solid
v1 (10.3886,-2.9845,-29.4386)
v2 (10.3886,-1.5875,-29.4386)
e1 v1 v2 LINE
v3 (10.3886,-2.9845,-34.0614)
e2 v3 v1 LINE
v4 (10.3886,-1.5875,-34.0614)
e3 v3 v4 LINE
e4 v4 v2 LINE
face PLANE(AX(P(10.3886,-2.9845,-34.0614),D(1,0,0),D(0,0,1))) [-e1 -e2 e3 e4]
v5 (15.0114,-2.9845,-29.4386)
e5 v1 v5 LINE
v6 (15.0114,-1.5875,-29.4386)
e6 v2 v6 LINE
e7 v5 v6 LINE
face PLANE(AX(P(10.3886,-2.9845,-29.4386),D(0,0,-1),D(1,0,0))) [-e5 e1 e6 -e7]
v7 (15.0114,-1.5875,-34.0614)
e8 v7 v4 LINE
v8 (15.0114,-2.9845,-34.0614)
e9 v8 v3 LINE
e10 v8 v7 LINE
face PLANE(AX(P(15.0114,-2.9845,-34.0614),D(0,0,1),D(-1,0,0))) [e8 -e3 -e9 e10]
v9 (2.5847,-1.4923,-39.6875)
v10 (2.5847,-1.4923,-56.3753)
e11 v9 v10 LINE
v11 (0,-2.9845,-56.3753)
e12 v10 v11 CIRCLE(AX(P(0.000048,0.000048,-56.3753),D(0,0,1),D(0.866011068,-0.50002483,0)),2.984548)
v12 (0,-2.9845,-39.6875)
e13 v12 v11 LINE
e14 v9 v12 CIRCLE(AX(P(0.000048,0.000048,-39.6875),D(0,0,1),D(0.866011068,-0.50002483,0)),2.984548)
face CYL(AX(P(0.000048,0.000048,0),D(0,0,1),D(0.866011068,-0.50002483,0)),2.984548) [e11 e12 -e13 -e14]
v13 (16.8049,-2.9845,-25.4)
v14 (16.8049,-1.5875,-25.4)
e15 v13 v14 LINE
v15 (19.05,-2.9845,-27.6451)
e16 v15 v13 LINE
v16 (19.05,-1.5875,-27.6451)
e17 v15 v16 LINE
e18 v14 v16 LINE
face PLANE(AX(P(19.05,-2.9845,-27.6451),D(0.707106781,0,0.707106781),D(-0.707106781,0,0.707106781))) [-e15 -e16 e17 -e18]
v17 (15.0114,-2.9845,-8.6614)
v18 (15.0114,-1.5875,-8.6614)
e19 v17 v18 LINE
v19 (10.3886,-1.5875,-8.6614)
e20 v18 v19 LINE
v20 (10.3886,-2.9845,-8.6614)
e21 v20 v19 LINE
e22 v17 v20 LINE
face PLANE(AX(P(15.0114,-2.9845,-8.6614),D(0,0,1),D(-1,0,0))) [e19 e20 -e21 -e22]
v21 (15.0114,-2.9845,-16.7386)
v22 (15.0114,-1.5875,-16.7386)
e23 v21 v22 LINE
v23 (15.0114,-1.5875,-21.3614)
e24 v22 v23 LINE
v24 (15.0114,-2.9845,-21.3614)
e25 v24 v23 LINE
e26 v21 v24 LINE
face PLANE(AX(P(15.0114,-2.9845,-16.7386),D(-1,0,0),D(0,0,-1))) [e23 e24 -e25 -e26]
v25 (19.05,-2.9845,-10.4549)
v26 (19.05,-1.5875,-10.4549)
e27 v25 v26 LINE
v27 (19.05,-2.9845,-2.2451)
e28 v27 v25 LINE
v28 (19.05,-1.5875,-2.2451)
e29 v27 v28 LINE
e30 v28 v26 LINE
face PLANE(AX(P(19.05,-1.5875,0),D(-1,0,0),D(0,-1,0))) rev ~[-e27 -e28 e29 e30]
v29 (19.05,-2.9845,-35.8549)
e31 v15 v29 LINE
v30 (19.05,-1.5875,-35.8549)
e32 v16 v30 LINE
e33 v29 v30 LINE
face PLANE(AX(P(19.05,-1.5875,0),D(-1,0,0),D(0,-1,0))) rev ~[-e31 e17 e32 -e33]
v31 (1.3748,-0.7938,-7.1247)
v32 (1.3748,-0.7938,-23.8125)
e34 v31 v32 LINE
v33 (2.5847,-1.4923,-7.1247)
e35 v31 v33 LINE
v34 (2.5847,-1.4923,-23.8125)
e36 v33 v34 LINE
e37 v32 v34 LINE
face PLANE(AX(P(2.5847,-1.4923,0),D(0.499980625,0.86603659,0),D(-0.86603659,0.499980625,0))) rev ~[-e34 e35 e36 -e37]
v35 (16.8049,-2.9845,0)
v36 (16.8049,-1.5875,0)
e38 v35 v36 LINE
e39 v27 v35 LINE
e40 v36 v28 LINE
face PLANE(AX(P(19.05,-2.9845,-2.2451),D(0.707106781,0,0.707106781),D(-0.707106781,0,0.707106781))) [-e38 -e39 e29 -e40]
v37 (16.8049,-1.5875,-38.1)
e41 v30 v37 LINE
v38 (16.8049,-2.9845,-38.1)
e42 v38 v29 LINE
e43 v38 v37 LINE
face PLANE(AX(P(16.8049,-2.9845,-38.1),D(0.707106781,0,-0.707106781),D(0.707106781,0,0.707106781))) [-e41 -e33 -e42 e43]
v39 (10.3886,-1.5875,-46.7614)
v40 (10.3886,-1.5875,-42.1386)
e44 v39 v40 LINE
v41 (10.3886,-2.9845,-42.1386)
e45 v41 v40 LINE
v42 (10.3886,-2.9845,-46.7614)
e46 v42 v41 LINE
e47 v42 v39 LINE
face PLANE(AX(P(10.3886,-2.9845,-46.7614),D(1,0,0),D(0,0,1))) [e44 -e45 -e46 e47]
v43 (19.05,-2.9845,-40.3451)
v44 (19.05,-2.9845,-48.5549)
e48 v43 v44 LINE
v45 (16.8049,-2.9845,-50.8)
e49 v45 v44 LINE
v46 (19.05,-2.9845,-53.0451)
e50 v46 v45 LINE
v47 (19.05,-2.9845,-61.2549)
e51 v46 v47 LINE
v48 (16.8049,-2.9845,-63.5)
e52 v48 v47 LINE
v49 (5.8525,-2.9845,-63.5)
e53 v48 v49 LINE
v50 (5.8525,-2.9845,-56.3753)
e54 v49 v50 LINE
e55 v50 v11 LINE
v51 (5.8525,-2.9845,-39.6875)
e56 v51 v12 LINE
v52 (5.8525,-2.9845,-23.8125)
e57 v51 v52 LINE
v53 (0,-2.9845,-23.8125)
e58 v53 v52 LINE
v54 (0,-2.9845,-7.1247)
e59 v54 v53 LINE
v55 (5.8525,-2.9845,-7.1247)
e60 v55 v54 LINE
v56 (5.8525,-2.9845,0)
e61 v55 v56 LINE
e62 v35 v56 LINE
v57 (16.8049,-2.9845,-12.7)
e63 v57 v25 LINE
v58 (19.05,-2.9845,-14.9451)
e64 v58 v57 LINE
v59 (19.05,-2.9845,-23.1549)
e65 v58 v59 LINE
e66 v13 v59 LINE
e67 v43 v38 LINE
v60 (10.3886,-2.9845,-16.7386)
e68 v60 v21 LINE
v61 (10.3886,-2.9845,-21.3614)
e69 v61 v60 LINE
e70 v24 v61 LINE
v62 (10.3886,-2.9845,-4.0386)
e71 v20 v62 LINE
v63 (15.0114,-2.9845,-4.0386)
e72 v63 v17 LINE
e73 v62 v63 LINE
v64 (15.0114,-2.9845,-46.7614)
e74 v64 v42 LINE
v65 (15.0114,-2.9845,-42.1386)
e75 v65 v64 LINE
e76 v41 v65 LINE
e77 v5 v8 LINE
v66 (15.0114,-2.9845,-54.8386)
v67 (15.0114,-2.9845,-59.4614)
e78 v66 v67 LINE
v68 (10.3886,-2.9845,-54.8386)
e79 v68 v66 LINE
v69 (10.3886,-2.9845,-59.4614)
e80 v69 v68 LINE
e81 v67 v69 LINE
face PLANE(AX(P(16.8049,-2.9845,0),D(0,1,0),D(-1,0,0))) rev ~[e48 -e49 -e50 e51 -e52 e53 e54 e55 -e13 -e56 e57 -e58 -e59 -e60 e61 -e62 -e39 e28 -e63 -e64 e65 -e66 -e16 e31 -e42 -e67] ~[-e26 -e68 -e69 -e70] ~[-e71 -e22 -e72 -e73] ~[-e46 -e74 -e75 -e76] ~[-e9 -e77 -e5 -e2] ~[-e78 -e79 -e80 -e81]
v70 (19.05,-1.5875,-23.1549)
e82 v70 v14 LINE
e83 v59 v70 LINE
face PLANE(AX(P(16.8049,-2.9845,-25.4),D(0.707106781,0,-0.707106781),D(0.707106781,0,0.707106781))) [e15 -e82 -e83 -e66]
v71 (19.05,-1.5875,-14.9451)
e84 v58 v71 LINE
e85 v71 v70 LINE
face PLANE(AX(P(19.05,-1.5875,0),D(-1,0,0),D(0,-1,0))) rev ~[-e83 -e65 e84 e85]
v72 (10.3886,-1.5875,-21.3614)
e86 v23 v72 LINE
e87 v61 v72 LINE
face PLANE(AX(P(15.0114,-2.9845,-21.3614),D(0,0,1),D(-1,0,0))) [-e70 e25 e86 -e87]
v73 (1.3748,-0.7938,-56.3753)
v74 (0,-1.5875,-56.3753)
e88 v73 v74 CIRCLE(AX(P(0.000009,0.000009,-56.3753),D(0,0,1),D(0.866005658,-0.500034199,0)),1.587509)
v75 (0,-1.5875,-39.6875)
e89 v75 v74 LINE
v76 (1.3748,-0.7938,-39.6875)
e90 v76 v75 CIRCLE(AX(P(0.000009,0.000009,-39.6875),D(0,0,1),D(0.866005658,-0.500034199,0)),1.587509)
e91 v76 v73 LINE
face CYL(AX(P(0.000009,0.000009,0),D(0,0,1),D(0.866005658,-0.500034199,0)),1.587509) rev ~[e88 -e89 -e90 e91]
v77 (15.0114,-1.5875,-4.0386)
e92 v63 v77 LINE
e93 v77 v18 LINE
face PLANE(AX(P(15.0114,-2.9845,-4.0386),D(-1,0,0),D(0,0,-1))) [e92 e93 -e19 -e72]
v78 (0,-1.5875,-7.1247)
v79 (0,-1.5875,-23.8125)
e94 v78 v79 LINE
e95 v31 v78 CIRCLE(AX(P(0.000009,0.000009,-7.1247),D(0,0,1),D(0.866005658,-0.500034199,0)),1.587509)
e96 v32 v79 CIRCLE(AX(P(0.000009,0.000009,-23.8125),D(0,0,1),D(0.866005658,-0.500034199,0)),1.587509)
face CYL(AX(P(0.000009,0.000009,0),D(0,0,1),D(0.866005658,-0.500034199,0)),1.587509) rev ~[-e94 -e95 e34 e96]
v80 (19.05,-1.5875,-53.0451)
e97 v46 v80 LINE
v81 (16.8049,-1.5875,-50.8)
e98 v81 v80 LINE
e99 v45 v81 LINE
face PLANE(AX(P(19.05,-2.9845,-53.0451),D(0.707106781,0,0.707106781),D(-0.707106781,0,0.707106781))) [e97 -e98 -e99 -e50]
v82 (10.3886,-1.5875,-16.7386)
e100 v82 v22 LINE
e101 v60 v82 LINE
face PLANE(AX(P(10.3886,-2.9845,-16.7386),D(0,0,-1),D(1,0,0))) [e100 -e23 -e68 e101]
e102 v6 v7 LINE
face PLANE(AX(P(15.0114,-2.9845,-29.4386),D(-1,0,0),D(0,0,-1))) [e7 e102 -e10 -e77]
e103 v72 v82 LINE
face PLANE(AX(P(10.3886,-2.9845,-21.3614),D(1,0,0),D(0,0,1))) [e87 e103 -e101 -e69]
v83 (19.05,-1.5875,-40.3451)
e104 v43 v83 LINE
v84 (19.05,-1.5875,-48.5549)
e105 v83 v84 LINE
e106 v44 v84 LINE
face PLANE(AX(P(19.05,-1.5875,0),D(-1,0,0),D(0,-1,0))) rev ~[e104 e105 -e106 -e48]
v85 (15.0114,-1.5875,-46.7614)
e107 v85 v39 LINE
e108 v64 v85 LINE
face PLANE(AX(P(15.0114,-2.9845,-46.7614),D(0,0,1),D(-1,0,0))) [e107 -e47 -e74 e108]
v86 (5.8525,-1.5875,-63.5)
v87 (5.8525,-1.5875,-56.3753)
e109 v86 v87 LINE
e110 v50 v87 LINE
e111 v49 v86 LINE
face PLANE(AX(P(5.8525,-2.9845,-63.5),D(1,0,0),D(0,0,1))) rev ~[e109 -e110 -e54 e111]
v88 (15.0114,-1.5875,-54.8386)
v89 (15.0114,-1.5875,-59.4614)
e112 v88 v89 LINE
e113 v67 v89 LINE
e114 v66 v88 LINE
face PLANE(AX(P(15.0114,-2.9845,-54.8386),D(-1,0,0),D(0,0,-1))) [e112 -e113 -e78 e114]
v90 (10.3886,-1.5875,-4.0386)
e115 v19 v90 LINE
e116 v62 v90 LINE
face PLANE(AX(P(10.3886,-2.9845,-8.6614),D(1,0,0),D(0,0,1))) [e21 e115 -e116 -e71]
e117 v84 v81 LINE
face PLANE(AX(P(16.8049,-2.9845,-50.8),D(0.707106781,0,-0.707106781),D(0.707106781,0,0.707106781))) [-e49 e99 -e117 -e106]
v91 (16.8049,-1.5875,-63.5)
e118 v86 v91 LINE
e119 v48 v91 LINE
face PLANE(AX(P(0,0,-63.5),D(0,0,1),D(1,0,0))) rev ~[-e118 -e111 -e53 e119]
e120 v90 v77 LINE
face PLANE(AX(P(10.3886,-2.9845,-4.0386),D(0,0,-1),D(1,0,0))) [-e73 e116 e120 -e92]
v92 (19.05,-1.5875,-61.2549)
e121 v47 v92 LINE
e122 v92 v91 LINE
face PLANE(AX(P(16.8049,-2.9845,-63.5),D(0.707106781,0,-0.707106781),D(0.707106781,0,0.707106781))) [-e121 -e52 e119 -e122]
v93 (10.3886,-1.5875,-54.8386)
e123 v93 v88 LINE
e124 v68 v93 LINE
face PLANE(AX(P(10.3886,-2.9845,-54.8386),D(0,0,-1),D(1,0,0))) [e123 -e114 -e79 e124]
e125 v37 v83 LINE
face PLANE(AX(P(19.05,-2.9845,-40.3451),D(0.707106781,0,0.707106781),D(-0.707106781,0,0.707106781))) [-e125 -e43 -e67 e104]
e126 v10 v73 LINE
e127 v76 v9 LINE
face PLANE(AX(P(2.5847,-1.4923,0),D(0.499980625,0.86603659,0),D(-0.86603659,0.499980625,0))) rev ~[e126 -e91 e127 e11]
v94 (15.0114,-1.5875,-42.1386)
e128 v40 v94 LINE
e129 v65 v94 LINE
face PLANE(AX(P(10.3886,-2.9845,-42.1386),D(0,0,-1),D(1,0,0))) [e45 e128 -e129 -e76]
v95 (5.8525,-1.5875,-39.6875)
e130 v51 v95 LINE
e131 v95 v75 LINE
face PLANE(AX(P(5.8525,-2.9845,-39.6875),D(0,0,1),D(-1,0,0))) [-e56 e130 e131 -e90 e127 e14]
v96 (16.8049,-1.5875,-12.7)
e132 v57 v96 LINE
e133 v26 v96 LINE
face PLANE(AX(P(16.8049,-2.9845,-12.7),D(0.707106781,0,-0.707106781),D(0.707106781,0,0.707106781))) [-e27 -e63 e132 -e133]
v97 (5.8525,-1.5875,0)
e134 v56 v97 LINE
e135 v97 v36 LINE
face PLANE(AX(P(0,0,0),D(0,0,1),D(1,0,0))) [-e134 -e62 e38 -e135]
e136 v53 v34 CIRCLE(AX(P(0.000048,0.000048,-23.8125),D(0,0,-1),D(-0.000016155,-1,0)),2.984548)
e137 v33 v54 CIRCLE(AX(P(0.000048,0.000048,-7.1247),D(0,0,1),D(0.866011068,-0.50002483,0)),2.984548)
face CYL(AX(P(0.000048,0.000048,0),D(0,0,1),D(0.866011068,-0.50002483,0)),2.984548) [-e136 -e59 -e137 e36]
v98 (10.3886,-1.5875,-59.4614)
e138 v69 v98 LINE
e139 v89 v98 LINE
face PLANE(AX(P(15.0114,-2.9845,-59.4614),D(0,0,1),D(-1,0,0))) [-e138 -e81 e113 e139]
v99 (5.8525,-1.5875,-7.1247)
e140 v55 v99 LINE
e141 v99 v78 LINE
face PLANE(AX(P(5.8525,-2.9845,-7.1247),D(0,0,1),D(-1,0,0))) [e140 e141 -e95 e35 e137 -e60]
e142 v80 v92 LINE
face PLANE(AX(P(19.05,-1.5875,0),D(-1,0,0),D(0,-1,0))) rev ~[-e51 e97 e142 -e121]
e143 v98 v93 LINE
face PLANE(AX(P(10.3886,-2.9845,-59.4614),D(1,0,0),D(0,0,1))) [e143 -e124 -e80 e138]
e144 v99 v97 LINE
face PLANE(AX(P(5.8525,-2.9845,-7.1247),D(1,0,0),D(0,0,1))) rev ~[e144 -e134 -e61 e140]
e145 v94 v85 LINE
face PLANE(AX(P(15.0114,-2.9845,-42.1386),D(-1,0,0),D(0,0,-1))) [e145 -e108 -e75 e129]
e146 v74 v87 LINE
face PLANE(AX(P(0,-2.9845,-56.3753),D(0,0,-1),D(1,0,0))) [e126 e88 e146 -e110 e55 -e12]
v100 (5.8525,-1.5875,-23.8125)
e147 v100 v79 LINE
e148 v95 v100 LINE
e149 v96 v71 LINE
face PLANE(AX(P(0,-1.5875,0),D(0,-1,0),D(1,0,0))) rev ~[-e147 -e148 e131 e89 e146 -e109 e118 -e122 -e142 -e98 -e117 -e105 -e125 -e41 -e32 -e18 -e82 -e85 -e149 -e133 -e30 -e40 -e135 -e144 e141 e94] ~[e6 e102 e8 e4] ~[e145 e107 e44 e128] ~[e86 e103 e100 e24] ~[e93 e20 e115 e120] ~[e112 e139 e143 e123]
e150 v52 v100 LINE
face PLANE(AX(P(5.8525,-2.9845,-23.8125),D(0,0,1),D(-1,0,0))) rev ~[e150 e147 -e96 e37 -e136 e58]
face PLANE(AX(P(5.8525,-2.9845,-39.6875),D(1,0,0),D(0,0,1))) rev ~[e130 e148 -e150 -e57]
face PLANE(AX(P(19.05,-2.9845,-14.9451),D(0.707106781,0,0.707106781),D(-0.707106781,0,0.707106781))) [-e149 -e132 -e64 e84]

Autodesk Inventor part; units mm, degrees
ref_plane "YZ Plane" through (0, 0, 0) normal (1, 0, 0) x (0, 1, 0)
ref_plane "XZ Plane" through (0, 0, 0) normal (0, 1, 0) x (-1, 0, 0)
ref_plane "XY Plane" through (0, 0, 0) normal (0, 0, 1) x (1, 0, 0)
sketch "Sketch1" plane through (0, 0, 0) normal (0, 0, 1) x (1, 0, 0)
  line L0 (2.5847, -1.4923) -> (1.3748, -0.7938)
  arc A0 (2.5847, -1.4923) -> (0, -2.9845) centre (0, 0) ccw
  arc A1 (1.3748, -0.7938) -> (0, -1.5875) centre (0, 0) ccw
  arc A2 (1.3748, -0.7938) -> (0, -1.5875) centre (0, 0) ccw
  line L1 (0, -1.5875) -> (16.8049, -1.5875)
  line L2 (16.8049, -2.9845) -> (0, -2.9845)
  arc A3 (2.5847, -1.4923) -> (0, -2.9845) centre (0, 0) ccw
  line L3 (2.5847, -1.4923) -> (1.3748, -0.7938)
  line L4 (19.05, -1.5875) -> (16.8049, -1.5875)
  line L5 (19.05, -2.9845) -> (16.8049, -2.9845)
  line L6 (19.05, -1.5875) -> (19.05, -2.9845)
  point P0 (0, 0)
  point P1 (15.875, -2.9845)
extrude "Extrusion1" add sketch "Sketch1" against normal blind 63.5
sketch "Sketch2" plane through (0, -2.9845, 0) normal (0, -1, 0) x (1, 0, 0)
  line L0 (19.05, -23.1549) -> (19.05, -14.9451)
  line L1 (19.05, -14.9451) -> (16.8049, -12.7)
  line L2 (16.8049, -12.7) -> (19.05, -10.4549)
  line L3 (19.05, -10.4549) -> (19.05, -2.2451)
  line L4 (19.05, -2.2451) -> (16.8049, 0)
  line L5 (-2.9845, 0) -> (16.8049, 0)
  line L6 (0, -7.1247) -> (0, 0)
  line L7 (5.8525, -7.1247) -> (-2.9845, -7.1247)
  line L8 (5.8525, -39.6875) -> (5.8525, 0)
  line L9 (5.8525, -23.8125) -> (-2.9845, -23.8125)
  line L10 (0, -39.6875) -> (0, -23.8125)
  line L11 (5.8525, -39.6875) -> (-2.9845, -39.6875)
  line L12 (5.8525, -63.5) -> (5.8525, -39.6875)
  line L13 (-2.9845, -56.3753) -> (5.8525, -56.3753)
  line L14 (0, -63.5) -> (0, -56.3753)
  line L15 (16.8049, -63.5) -> (-2.9845, -63.5)
  line L16 (16.8049, -63.5) -> (19.05, -61.2549)
  line L17 (19.05, -61.2549) -> (19.05, -53.0451)
  line L18 (19.05, -53.0451) -> (16.8049, -50.8)
  line L19 (16.8049, -50.8) -> (19.05, -48.5549)
  line L20 (19.05, -48.5549) -> (19.05, -40.3451)
  line L21 (19.05, -40.3451) -> (16.8049, -38.1)
  line L22 (16.8049, -38.1) -> (19.05, -35.8549)
  line L23 (19.05, -35.8549) -> (19.05, -27.6451)
  line L24 (19.05, -27.6451) -> (16.8049, -25.4)
  line L25 (16.8049, -25.4) -> (19.05, -23.1549)
  line L26 (15.0114, -42.1386) -> (15.0114, -46.7614)
  line L27 (15.0114, -46.7614) -> (10.3886, -46.7614)
  line L28 (10.3886, -46.7614) -> (10.3886, -42.1386)
  line L29 (10.3886, -42.1386) -> (15.0114, -42.1386)
  line L30 (15.0114, -29.4386) -> (15.0114, -34.0614)
  line L31 (15.0114, -34.0614) -> (10.3886, -34.0614)
  line L32 (10.3886, -34.0614) -> (10.3886, -29.4386)
  line L33 (10.3886, -29.4386) -> (15.0114, -29.4386)
  line L34 (15.0114, -16.7386) -> (15.0114, -21.3614)
  line L35 (15.0114, -21.3614) -> (10.3886, -21.3614)
  line L36 (10.3886, -21.3614) -> (10.3886, -16.7386)
  line L37 (10.3886, -16.7386) -> (15.0114, -16.7386)
  line L38 (15.0114, -4.0386) -> (15.0114, -8.6614)
  line L39 (15.0114, -8.6614) -> (10.3886, -8.6614)
  line L40 (10.3886, -8.6614) -> (10.3886, -4.0386)
  line L41 (10.3886, -4.0386) -> (15.0114, -4.0386)
  line L42 (15.0114, -54.8386) -> (15.0114, -59.4614)
  line L43 (15.0114, -59.4614) -> (10.3886, -59.4614)
  line L44 (10.3886, -59.4614) -> (10.3886, -54.8386)
  line L45 (10.3886, -54.8386) -> (15.0114, -54.8386)
  line L46 (-2.9845, 0) -> (-2.9845, -63.5) projected
  line L47 (19.05, -53.0451) -> (19.05, -48.5549)
  line L48 (19.05, -40.3451) -> (19.05, -35.8549)
  line L49 (19.05, -27.6451) -> (19.05, -23.1549)
  line L50 (19.05, -14.9451) -> (19.05, -10.4549)
  line L51 (0, 0) -> (16.8049, 0) projected
  line L52 (16.8049, -63.5) -> (19.05, -63.5)
  line L53 (19.05, -63.5) -> (19.05, -61.2549)
  line L54 (19.05, -2.2451) -> (19.05, 0)
  line L55 (19.05, 0) -> (16.8049, 0)
  line L56 (16.8049, -63.5) -> (19.05, -61.2549)
  line L57 (19.05, -2.2451) -> (16.8049, 0)
  line L58 (0, -63.5) -> (16.8049, -63.5) projected
  line L59 (5.8525, -7.1247) -> (-2.9845, -7.1247)
  line L60 (-2.9845, -7.1247) -> (-2.9845, 0)
  line L61 (-2.9845, 0) -> (5.8525, 0)
  line L62 (5.8525, 0) -> (5.8525, -7.1247)
  point P0 (15.875, -31.75)
extrude "Extrusion2" cut sketch "Sketch2" against normal blind 6.35 contours L49 L24 L25 | L1 L2 L50 | L48 L21 L22 | L4 L55 L54 | L47 L18 L19 | L8 L7 L6 L5 | L6 L7 L46 L5 | L53 L52 L16 | L8 L11 L10 L9 | L10 L11 L46 L9 | L15 L14 L13 L12 | L15 L46 L13 L14 | L26 L27 L28 L29 | L30 L31 L32 L33 | L34 L35 L36 L37 | L38 L39 L40 L41 | L42 L43 L44 L45
sketch "Sketch3" plane through (0, -2.9845, 0) normal (0, -1, 0) x (1, 0, 0)
  line L0 (15.0114, -8.6614) -> (10.3886, -8.6614) projected
  circle A0 centre (12.7, -6.35) radius 2.3114
surface extrude "ExtrusionSrf1" sketch "Sketch3" against normal up to surface (1.397 mm away) shown no curves A0
pattern_linear "Rectangular Pattern1" count 5 spacing 12.7 along (0, 0, -1) of "ExtrusionSrf1"
properties part number "275-1272"
